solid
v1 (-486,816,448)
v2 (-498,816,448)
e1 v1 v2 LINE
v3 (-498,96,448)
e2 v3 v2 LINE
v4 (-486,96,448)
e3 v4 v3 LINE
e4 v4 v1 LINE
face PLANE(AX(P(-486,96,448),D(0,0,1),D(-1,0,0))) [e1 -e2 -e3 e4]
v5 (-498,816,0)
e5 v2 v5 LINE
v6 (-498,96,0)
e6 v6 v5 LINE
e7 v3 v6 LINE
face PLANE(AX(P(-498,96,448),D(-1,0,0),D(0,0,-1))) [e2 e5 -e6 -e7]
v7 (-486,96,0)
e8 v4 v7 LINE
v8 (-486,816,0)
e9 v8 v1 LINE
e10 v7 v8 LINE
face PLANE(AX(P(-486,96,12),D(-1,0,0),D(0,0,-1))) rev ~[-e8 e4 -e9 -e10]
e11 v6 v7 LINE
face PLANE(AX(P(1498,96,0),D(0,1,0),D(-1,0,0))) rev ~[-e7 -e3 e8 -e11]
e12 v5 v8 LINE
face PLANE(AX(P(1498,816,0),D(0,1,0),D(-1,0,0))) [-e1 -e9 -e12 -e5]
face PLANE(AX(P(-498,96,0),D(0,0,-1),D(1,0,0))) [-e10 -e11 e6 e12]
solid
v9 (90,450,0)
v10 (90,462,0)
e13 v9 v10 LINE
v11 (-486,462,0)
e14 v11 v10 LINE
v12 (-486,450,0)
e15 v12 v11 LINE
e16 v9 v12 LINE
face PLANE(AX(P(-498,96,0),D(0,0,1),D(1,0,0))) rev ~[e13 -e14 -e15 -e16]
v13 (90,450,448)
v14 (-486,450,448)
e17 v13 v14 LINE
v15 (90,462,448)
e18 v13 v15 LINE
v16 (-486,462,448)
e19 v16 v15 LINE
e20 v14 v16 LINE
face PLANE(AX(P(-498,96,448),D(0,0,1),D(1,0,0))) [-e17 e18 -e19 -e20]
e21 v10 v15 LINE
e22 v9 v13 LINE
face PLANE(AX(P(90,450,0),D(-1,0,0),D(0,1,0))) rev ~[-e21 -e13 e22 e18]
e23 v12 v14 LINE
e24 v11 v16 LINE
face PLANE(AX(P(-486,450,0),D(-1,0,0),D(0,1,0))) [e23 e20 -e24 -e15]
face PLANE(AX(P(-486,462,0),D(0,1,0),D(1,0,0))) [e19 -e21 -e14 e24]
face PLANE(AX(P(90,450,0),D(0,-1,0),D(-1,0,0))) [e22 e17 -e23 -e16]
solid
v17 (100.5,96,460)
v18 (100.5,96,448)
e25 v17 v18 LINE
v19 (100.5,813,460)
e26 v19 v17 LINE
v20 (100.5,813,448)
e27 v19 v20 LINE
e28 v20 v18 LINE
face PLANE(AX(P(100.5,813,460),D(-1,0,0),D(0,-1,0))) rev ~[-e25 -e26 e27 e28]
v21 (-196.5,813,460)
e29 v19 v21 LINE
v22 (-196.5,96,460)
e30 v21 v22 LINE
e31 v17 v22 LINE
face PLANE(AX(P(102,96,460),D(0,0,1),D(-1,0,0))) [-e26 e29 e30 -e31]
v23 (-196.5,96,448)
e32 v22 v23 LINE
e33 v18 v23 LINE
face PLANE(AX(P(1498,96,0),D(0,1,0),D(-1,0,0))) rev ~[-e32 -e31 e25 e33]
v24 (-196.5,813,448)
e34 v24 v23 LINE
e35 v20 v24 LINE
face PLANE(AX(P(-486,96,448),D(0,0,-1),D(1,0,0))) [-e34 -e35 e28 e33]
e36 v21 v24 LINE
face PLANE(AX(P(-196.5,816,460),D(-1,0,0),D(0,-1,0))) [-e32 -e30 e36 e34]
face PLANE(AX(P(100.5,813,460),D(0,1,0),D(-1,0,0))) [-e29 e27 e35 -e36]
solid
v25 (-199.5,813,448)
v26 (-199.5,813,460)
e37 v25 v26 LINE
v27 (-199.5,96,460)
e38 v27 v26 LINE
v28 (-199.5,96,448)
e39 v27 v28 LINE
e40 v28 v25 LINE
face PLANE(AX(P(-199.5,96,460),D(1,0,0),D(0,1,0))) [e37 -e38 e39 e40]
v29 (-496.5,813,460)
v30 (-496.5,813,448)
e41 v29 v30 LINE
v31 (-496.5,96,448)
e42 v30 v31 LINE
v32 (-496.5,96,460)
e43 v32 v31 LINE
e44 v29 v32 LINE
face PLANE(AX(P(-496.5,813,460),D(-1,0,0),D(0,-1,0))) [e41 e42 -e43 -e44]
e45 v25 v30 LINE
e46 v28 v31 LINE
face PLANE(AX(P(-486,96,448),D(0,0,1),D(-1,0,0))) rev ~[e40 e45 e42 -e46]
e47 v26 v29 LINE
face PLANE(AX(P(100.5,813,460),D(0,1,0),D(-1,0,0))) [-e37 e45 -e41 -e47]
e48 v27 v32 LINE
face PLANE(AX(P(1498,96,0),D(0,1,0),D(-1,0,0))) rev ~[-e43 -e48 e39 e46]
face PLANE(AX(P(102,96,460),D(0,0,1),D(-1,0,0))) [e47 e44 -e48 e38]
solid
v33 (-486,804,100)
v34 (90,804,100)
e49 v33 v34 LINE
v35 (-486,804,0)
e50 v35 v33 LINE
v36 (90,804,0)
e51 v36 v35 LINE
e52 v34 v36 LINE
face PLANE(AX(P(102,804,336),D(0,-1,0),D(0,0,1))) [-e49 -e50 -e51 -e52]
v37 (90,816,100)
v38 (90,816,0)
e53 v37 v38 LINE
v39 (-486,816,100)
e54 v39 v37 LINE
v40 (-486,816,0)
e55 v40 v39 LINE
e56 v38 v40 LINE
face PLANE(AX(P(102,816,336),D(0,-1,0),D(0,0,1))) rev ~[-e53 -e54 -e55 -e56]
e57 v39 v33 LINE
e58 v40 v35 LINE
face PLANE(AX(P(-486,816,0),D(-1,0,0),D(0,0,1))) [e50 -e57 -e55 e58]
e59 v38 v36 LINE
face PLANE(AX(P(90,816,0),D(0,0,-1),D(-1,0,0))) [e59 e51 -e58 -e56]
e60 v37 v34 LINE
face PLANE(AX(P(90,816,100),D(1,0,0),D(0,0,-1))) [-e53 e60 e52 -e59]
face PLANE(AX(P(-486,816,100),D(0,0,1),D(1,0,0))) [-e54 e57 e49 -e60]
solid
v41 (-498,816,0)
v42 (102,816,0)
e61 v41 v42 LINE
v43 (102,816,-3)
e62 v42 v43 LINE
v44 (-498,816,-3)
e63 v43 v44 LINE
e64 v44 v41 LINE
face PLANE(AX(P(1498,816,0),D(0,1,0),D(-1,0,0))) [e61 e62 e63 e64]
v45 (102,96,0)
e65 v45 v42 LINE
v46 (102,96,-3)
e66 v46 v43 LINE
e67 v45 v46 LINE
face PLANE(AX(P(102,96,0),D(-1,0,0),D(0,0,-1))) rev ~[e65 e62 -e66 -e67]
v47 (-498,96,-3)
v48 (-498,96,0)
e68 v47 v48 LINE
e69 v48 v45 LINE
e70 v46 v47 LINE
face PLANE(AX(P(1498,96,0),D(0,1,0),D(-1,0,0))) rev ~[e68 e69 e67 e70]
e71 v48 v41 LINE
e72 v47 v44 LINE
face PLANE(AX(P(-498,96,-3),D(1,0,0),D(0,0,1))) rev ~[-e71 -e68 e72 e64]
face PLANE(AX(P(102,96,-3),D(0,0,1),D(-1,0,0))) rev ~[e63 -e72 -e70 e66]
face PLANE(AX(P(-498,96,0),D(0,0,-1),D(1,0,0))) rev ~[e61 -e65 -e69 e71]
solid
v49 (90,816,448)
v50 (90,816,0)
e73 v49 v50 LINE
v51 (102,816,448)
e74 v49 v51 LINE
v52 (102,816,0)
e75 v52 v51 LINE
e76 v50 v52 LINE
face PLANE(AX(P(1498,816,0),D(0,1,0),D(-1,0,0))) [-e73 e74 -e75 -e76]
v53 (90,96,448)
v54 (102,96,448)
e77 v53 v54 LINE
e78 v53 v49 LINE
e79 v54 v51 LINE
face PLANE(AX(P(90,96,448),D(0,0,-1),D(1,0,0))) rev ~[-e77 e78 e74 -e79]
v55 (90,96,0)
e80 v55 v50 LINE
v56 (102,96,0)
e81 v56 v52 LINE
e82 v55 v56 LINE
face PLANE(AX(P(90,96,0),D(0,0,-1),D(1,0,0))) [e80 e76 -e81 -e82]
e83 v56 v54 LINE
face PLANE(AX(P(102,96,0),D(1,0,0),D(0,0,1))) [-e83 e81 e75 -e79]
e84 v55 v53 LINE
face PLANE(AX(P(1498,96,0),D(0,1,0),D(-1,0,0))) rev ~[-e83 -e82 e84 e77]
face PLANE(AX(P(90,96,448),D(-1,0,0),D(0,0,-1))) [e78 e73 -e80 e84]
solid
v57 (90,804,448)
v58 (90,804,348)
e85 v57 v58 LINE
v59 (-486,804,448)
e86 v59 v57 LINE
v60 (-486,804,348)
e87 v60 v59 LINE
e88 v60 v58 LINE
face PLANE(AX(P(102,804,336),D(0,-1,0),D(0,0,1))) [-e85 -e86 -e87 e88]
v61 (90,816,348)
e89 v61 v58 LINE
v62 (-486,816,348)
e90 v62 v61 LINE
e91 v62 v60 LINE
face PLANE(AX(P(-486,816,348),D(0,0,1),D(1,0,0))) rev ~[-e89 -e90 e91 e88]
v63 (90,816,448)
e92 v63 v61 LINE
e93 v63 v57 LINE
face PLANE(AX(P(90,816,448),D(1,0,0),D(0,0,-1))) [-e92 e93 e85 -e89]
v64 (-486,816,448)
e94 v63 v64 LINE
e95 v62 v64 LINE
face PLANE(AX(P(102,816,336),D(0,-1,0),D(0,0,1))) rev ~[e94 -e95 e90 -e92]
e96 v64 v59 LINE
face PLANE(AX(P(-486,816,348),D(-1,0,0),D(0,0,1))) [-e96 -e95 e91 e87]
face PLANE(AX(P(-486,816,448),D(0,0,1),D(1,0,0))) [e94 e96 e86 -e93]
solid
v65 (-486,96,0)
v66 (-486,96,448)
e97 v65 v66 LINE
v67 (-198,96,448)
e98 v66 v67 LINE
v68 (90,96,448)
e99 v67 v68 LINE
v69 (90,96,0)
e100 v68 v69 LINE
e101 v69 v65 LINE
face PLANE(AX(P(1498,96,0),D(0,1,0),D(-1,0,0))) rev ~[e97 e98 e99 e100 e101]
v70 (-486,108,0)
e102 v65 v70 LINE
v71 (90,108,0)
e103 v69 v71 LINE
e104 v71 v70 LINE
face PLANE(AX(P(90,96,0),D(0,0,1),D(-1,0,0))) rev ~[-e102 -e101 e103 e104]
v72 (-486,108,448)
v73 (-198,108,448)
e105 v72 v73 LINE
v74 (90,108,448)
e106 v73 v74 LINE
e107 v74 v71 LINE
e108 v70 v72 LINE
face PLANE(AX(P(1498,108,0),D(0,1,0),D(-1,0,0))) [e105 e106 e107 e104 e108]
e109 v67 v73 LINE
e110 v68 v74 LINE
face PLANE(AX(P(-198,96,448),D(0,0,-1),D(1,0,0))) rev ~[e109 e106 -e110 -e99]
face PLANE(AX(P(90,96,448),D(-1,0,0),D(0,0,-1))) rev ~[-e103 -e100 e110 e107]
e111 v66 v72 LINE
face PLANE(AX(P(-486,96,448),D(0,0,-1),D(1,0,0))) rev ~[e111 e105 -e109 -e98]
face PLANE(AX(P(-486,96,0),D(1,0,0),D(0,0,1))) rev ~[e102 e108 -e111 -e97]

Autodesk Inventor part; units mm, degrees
ref_plane "YZ Plane" through (0, 0, 0) normal (1, 0, 0) x (0, 1, 0)
sketch "Sketch1" plane through (0, 0, 0) normal (0, 0, 1) x (1, 0, 0)
  line L0 (-1498, 0) -> (1498, 0) construction
  line L1 (-1498, 0) -> (-898, 0)
  line L2 (-898, 0) -> (-898, 2068)
  line L3 (-898, 2068) -> (-1498, 2068)
  line L4 (-1498, 2068) -> (-1498, 0)
  line L5 (-898, 0) -> (-498, 0)
  line L6 (-498, 0) -> (-498, 816)
  line L7 (-498, 816) -> (-898, 816)
  line L8 (-898, 816) -> (-898, 0)
  line L9 (-498, 0) -> (102, 0)
  line L10 (102, 0) -> (102, 816)
  line L11 (102, 816) -> (-498, 816)
  line L12 (-498, 816) -> (-498, 0)
  line L13 (102, 0) -> (698, 0)
  line L14 (698, 0) -> (698, 668)
  line L15 (698, 668) -> (102, 668)
  line L16 (102, 668) -> (102, 0)
  line L17 (698, 0) -> (1498, 0)
  line L18 (1498, 0) -> (1498, 816)
  line L19 (1498, 816) -> (698, 816)
  line L20 (698, 816) -> (698, 0)
  line L21 (-1498, 0) -> (1498, 0)
  line L22 (1498, 0) -> (1498, 96)
  line L23 (1498, 96) -> (-1498, 96)
  line L24 (-1498, 96) -> (-1498, 0)
  line L25 (-898, 816) -> (1498, 816)
  line L26 (1498, 816) -> (1498, 832)
  line L27 (1498, 832) -> (-898, 832)
  line L28 (-898, 832) -> (-898, 816)
  line L29 (-898, 1972) -> (-498, 1972)
  line L30 (-498, 1972) -> (-498, 1372)
  line L31 (-498, 1372) -> (-898, 1372)
  line L32 (-898, 1372) -> (-898, 1972)
  line L33 (698, 1972) -> (1498, 1972)
  line L34 (1498, 1972) -> (1498, 1372)
  line L35 (1498, 1372) -> (698, 1372)
  line L36 (698, 1372) -> (698, 1972)
  line L37 (698, 1372) -> (98, 1372)
  line L38 (98, 1372) -> (98, 1972)
  line L39 (98, 1972) -> (698, 1972)
  line L40 (698, 1972) -> (698, 1372)
  line L41 (-498, 1372) -> (98, 1372)
  line L42 (-498, 1372) -> (-275, 1637.7611)
  line L43 (98, 1372) -> (-125, 1637.7611)
  line L44 (-275, 1637.7611) -> (-125, 1637.7611)
  line L45 (-125, 1637.7611) -> (-125, 2068)
  line L46 (-125, 2068) -> (-275, 2068)
  line L47 (-275, 2068) -> (-275, 1637.7611)
  line L48 (1098, 816) -> (1098, 96)
  line L49 (-198, 816) -> (-198, 96)
  line L50 (-898, 668) -> (-498, 668)
  line L51 (-1498, 520) -> (-898, 520)
  line L52 (-1498, 1579) -> (-898, 1579)
  line L53 (398, 1972) -> (398, 1372)
  line L54 (1098, 1972) -> (1098, 1372)
  line L55 (698, 1876) -> (1498, 1876)
  line L56 (698, 1468) -> (1498, 1468)
  line L57 (-1498, 1049.5) -> (-898, 1049.5)
  point P0 (0, 0)
  point P1 (0, 0)
  point P2 (0, 0)
  point P3 (-198, 816)
  point P4 (0, 0)
  dimension "d0" = 2996
  dimension "d1" = 600
  dimension "d2" = 2068
  dimension "d3" = 400
  dimension "d4" = 816
  dimension "d5" = 600
  dimension "d6" = 816
  dimension "d7" = 596
  dimension "d8" = 668
  dimension "d9" = 800
  dimension "d10" = 816
  dimension "d11" = 96
  dimension "d12" = 16
  dimension "d13" = 400
  dimension "d14" = 600
  dimension "d15" = 96
  dimension "d16" = 800
  dimension "d17" = 600
  dimension "d18" = 600
  dimension "d19" = 600
  dimension "d20" = 50
  dimension "d21" = 150
  dimension "d22" = 148
  dimension "d23" = 1059
  dimension "d24" = 96
  dimension "d25" = 96
  dimension "d26" = 529.5
ref_plane "Work Plane1" through (1498, 96, 0) normal (0, 1, 0) x (-1, 0, 0)
sketch "Sketch2" plane through (1498, 96, 0) normal (0, 1, 0) x (-1, 0, 0)
  line L0 (1996, 0) -> (1396, 0)
  line L1 (1396, 0) -> (1396, 460)
  line L2 (1396, 460) -> (1996, 460)
  line L3 (1996, 460) -> (1996, 0)
  line L4 (1984, 448) -> (1408, 448)
  line L5 (1408, 448) -> (1408, 12)
  line L6 (1408, 12) -> (1984, 12)
  line L7 (1984, 12) -> (1984, 448)
  line L8 (1984, 12) -> (1984, 0)
  line L9 (1408, 12) -> (1408, 0)
  line L10 (1408, 448) -> (1396, 448)
  line L11 (1984, 448) -> (1996, 448)
  point P0 (1498, 0)
  point P1 (1996, 0)
  point P2 (1396, 0)
  dimension "d28" = 460
  dimension "d29" = 12
extrude "Extrusion1" add sketch "Sketch2" along normal up to surface (720 mm away) contours L0 L8 L7 L11 L3 | L0 L1 L10 L5 L9
extrude "Extrusion2" add sketch "Sketch2" along normal up to surface (720 mm away) separate body contours L11 L4 L10 L1 L2 L3
split body "Split1" sketch "Sketch1" result two bodies bodies 2 curves L49 first body at (2, 336, 459.5)
sketch "Sketch3" plane through (1498, 96, 0) normal (0, 1, 0) x (-1, 0, 0)
  line L0 (1996, 0) -> (1996, 448) projected
  line L1 (1996, 0) -> (1396, 0)
  line L2 (1396, 0) -> (1396, -3)
  line L3 (1396, -3) -> (1996, -3)
  line L4 (1996, -3) -> (1996, 0)
  point P0 (1498, 0)
  dimension "d34" = 3
extrude "Extrusion3" add sketch "Sketch3" along normal up to surface (720 mm away) separate body
sketch "Sketch4" plane through (1498, 96, 0) normal (0, 1, 0) x (-1, 0, 0)
  line L0 (1984, 0) -> (1984, 448) projected
  line L1 (1396, 0) -> (1996, 0) projected
  line L2 (1408, 448) -> (1408, 0) projected
  line L3 (1996, 448) -> (1696, 448) projected
  line L4 (1696, 448) -> (1396, 448) projected
  point P0 (1498, 0)
extrude "Extrusion4" add sketch "Sketch4" along normal blind 12 separate body
ref_plane "Work Plane2" through (102, 816, 336) normal (0, -1, 0) x (0, 0, 1)
sketch "Sketch5" plane through (102, 816, 336) normal (0, -1, 0) x (0, 0, 1)
  line L0 (-336, 588) -> (112, 588) projected
  line L1 (112, 12) -> (-336, 12) projected
  line L2 (-336, 0) -> (-336, 600) projected
  line L3 (112, 600) -> (112, 300) projected
  line L4 (112, 300) -> (112, 0) projected
  line L5 (-236, 588) -> (-236, 12)
  line L6 (12, 588) -> (12, 12)
  point P0 (-336, 102)
  dimension "d39" = 100
  dimension "d40" = 100
extrude "Extrusion5" add sketch "Sketch5" along normal blind 12 separate body contours L0 L5 L1 L2 | L0 L3 L4 L1 L6
sketch "Sketch6" plane through (102, 96, 460) normal (0, 0, 1) x (1, 0, 0)
  line L0 (-600, 720) -> (-300, 720) projected
  line L1 (0, 0) -> (-300, 0) projected
  line L2 (-301.5, 720) -> (-298.5, 720)
  line L3 (-298.5, 720) -> (-298.5, 0)
  line L4 (-298.5, 0) -> (-301.5, 0)
  line L5 (-301.5, 0) -> (-301.5, 720)
  line L6 (-300, 0) -> (-300, 720) projected
  point P0 (-102, -96)
  point P1 (-300, 720)
  dimension "d43" = 1.5
  dimension "d44" = 1.5
extrude "Extrusion6" cut sketch "Sketch6" against normal blind 12 bodies 3 4
sketch "Sketch7" plane through (-498, 96, 0) normal (0, 0, 1) x (1, 0, 0)
  line L0 (12, 0) -> (12, 720) projected
  line L1 (588, 0) -> (588, 720) projected
  line L2 (12, 366) -> (588, 366)
  line L3 (588, 366) -> (588, 354)
  line L4 (588, 354) -> (12, 354)
  line L5 (12, 354) -> (12, 366)
  line L6 (12, 12) -> (588, 12) projected
  point P0 (498, -96)
  point P1 (12, 354)
  dimension "d47" = 342
  dimension "d48" = 12
extrude "Extrusion7" add sketch "Sketch7" along normal up to surface (448 mm away) separate body contours L0 L2 L1 L4
sketch "Sketch9" plane through (-498, 96, 460) normal (0, 0, 1) x (1, 0, 0)
  line L0 (0, 0) -> (0, 720) projected
  line L1 (600, 0) -> (600, 720) projected
  line L2 (0, 720) -> (600, 720)
  line L3 (600, 720) -> (600, 717)
  line L4 (600, 717) -> (0, 717)
  line L5 (0, 717) -> (0, 720)
  line L6 (0, 0) -> (298.5, 0) projected
  line L7 (0, 717) -> (1.5, 717)
  line L8 (1.5, 717) -> (1.5, 0)
  line L9 (1.5, 0) -> (0, 0)
  line L10 (0, 0) -> (0, 717)
  line L11 (600, 717) -> (598.5, 717)
  line L12 (598.5, 717) -> (598.5, 0)
  line L13 (598.5, 0) -> (600, 0)
  line L14 (600, 0) -> (600, 717)
  point P0 (498, -96)
  dimension "d55" = 3
  dimension "d56" = 1.5
  dimension "d57" = 1.5
extrude "Extrusion9" cut sketch "Sketch9" against normal blind 12 bodies 4 3
properties part number "Base Cabinet 3"
